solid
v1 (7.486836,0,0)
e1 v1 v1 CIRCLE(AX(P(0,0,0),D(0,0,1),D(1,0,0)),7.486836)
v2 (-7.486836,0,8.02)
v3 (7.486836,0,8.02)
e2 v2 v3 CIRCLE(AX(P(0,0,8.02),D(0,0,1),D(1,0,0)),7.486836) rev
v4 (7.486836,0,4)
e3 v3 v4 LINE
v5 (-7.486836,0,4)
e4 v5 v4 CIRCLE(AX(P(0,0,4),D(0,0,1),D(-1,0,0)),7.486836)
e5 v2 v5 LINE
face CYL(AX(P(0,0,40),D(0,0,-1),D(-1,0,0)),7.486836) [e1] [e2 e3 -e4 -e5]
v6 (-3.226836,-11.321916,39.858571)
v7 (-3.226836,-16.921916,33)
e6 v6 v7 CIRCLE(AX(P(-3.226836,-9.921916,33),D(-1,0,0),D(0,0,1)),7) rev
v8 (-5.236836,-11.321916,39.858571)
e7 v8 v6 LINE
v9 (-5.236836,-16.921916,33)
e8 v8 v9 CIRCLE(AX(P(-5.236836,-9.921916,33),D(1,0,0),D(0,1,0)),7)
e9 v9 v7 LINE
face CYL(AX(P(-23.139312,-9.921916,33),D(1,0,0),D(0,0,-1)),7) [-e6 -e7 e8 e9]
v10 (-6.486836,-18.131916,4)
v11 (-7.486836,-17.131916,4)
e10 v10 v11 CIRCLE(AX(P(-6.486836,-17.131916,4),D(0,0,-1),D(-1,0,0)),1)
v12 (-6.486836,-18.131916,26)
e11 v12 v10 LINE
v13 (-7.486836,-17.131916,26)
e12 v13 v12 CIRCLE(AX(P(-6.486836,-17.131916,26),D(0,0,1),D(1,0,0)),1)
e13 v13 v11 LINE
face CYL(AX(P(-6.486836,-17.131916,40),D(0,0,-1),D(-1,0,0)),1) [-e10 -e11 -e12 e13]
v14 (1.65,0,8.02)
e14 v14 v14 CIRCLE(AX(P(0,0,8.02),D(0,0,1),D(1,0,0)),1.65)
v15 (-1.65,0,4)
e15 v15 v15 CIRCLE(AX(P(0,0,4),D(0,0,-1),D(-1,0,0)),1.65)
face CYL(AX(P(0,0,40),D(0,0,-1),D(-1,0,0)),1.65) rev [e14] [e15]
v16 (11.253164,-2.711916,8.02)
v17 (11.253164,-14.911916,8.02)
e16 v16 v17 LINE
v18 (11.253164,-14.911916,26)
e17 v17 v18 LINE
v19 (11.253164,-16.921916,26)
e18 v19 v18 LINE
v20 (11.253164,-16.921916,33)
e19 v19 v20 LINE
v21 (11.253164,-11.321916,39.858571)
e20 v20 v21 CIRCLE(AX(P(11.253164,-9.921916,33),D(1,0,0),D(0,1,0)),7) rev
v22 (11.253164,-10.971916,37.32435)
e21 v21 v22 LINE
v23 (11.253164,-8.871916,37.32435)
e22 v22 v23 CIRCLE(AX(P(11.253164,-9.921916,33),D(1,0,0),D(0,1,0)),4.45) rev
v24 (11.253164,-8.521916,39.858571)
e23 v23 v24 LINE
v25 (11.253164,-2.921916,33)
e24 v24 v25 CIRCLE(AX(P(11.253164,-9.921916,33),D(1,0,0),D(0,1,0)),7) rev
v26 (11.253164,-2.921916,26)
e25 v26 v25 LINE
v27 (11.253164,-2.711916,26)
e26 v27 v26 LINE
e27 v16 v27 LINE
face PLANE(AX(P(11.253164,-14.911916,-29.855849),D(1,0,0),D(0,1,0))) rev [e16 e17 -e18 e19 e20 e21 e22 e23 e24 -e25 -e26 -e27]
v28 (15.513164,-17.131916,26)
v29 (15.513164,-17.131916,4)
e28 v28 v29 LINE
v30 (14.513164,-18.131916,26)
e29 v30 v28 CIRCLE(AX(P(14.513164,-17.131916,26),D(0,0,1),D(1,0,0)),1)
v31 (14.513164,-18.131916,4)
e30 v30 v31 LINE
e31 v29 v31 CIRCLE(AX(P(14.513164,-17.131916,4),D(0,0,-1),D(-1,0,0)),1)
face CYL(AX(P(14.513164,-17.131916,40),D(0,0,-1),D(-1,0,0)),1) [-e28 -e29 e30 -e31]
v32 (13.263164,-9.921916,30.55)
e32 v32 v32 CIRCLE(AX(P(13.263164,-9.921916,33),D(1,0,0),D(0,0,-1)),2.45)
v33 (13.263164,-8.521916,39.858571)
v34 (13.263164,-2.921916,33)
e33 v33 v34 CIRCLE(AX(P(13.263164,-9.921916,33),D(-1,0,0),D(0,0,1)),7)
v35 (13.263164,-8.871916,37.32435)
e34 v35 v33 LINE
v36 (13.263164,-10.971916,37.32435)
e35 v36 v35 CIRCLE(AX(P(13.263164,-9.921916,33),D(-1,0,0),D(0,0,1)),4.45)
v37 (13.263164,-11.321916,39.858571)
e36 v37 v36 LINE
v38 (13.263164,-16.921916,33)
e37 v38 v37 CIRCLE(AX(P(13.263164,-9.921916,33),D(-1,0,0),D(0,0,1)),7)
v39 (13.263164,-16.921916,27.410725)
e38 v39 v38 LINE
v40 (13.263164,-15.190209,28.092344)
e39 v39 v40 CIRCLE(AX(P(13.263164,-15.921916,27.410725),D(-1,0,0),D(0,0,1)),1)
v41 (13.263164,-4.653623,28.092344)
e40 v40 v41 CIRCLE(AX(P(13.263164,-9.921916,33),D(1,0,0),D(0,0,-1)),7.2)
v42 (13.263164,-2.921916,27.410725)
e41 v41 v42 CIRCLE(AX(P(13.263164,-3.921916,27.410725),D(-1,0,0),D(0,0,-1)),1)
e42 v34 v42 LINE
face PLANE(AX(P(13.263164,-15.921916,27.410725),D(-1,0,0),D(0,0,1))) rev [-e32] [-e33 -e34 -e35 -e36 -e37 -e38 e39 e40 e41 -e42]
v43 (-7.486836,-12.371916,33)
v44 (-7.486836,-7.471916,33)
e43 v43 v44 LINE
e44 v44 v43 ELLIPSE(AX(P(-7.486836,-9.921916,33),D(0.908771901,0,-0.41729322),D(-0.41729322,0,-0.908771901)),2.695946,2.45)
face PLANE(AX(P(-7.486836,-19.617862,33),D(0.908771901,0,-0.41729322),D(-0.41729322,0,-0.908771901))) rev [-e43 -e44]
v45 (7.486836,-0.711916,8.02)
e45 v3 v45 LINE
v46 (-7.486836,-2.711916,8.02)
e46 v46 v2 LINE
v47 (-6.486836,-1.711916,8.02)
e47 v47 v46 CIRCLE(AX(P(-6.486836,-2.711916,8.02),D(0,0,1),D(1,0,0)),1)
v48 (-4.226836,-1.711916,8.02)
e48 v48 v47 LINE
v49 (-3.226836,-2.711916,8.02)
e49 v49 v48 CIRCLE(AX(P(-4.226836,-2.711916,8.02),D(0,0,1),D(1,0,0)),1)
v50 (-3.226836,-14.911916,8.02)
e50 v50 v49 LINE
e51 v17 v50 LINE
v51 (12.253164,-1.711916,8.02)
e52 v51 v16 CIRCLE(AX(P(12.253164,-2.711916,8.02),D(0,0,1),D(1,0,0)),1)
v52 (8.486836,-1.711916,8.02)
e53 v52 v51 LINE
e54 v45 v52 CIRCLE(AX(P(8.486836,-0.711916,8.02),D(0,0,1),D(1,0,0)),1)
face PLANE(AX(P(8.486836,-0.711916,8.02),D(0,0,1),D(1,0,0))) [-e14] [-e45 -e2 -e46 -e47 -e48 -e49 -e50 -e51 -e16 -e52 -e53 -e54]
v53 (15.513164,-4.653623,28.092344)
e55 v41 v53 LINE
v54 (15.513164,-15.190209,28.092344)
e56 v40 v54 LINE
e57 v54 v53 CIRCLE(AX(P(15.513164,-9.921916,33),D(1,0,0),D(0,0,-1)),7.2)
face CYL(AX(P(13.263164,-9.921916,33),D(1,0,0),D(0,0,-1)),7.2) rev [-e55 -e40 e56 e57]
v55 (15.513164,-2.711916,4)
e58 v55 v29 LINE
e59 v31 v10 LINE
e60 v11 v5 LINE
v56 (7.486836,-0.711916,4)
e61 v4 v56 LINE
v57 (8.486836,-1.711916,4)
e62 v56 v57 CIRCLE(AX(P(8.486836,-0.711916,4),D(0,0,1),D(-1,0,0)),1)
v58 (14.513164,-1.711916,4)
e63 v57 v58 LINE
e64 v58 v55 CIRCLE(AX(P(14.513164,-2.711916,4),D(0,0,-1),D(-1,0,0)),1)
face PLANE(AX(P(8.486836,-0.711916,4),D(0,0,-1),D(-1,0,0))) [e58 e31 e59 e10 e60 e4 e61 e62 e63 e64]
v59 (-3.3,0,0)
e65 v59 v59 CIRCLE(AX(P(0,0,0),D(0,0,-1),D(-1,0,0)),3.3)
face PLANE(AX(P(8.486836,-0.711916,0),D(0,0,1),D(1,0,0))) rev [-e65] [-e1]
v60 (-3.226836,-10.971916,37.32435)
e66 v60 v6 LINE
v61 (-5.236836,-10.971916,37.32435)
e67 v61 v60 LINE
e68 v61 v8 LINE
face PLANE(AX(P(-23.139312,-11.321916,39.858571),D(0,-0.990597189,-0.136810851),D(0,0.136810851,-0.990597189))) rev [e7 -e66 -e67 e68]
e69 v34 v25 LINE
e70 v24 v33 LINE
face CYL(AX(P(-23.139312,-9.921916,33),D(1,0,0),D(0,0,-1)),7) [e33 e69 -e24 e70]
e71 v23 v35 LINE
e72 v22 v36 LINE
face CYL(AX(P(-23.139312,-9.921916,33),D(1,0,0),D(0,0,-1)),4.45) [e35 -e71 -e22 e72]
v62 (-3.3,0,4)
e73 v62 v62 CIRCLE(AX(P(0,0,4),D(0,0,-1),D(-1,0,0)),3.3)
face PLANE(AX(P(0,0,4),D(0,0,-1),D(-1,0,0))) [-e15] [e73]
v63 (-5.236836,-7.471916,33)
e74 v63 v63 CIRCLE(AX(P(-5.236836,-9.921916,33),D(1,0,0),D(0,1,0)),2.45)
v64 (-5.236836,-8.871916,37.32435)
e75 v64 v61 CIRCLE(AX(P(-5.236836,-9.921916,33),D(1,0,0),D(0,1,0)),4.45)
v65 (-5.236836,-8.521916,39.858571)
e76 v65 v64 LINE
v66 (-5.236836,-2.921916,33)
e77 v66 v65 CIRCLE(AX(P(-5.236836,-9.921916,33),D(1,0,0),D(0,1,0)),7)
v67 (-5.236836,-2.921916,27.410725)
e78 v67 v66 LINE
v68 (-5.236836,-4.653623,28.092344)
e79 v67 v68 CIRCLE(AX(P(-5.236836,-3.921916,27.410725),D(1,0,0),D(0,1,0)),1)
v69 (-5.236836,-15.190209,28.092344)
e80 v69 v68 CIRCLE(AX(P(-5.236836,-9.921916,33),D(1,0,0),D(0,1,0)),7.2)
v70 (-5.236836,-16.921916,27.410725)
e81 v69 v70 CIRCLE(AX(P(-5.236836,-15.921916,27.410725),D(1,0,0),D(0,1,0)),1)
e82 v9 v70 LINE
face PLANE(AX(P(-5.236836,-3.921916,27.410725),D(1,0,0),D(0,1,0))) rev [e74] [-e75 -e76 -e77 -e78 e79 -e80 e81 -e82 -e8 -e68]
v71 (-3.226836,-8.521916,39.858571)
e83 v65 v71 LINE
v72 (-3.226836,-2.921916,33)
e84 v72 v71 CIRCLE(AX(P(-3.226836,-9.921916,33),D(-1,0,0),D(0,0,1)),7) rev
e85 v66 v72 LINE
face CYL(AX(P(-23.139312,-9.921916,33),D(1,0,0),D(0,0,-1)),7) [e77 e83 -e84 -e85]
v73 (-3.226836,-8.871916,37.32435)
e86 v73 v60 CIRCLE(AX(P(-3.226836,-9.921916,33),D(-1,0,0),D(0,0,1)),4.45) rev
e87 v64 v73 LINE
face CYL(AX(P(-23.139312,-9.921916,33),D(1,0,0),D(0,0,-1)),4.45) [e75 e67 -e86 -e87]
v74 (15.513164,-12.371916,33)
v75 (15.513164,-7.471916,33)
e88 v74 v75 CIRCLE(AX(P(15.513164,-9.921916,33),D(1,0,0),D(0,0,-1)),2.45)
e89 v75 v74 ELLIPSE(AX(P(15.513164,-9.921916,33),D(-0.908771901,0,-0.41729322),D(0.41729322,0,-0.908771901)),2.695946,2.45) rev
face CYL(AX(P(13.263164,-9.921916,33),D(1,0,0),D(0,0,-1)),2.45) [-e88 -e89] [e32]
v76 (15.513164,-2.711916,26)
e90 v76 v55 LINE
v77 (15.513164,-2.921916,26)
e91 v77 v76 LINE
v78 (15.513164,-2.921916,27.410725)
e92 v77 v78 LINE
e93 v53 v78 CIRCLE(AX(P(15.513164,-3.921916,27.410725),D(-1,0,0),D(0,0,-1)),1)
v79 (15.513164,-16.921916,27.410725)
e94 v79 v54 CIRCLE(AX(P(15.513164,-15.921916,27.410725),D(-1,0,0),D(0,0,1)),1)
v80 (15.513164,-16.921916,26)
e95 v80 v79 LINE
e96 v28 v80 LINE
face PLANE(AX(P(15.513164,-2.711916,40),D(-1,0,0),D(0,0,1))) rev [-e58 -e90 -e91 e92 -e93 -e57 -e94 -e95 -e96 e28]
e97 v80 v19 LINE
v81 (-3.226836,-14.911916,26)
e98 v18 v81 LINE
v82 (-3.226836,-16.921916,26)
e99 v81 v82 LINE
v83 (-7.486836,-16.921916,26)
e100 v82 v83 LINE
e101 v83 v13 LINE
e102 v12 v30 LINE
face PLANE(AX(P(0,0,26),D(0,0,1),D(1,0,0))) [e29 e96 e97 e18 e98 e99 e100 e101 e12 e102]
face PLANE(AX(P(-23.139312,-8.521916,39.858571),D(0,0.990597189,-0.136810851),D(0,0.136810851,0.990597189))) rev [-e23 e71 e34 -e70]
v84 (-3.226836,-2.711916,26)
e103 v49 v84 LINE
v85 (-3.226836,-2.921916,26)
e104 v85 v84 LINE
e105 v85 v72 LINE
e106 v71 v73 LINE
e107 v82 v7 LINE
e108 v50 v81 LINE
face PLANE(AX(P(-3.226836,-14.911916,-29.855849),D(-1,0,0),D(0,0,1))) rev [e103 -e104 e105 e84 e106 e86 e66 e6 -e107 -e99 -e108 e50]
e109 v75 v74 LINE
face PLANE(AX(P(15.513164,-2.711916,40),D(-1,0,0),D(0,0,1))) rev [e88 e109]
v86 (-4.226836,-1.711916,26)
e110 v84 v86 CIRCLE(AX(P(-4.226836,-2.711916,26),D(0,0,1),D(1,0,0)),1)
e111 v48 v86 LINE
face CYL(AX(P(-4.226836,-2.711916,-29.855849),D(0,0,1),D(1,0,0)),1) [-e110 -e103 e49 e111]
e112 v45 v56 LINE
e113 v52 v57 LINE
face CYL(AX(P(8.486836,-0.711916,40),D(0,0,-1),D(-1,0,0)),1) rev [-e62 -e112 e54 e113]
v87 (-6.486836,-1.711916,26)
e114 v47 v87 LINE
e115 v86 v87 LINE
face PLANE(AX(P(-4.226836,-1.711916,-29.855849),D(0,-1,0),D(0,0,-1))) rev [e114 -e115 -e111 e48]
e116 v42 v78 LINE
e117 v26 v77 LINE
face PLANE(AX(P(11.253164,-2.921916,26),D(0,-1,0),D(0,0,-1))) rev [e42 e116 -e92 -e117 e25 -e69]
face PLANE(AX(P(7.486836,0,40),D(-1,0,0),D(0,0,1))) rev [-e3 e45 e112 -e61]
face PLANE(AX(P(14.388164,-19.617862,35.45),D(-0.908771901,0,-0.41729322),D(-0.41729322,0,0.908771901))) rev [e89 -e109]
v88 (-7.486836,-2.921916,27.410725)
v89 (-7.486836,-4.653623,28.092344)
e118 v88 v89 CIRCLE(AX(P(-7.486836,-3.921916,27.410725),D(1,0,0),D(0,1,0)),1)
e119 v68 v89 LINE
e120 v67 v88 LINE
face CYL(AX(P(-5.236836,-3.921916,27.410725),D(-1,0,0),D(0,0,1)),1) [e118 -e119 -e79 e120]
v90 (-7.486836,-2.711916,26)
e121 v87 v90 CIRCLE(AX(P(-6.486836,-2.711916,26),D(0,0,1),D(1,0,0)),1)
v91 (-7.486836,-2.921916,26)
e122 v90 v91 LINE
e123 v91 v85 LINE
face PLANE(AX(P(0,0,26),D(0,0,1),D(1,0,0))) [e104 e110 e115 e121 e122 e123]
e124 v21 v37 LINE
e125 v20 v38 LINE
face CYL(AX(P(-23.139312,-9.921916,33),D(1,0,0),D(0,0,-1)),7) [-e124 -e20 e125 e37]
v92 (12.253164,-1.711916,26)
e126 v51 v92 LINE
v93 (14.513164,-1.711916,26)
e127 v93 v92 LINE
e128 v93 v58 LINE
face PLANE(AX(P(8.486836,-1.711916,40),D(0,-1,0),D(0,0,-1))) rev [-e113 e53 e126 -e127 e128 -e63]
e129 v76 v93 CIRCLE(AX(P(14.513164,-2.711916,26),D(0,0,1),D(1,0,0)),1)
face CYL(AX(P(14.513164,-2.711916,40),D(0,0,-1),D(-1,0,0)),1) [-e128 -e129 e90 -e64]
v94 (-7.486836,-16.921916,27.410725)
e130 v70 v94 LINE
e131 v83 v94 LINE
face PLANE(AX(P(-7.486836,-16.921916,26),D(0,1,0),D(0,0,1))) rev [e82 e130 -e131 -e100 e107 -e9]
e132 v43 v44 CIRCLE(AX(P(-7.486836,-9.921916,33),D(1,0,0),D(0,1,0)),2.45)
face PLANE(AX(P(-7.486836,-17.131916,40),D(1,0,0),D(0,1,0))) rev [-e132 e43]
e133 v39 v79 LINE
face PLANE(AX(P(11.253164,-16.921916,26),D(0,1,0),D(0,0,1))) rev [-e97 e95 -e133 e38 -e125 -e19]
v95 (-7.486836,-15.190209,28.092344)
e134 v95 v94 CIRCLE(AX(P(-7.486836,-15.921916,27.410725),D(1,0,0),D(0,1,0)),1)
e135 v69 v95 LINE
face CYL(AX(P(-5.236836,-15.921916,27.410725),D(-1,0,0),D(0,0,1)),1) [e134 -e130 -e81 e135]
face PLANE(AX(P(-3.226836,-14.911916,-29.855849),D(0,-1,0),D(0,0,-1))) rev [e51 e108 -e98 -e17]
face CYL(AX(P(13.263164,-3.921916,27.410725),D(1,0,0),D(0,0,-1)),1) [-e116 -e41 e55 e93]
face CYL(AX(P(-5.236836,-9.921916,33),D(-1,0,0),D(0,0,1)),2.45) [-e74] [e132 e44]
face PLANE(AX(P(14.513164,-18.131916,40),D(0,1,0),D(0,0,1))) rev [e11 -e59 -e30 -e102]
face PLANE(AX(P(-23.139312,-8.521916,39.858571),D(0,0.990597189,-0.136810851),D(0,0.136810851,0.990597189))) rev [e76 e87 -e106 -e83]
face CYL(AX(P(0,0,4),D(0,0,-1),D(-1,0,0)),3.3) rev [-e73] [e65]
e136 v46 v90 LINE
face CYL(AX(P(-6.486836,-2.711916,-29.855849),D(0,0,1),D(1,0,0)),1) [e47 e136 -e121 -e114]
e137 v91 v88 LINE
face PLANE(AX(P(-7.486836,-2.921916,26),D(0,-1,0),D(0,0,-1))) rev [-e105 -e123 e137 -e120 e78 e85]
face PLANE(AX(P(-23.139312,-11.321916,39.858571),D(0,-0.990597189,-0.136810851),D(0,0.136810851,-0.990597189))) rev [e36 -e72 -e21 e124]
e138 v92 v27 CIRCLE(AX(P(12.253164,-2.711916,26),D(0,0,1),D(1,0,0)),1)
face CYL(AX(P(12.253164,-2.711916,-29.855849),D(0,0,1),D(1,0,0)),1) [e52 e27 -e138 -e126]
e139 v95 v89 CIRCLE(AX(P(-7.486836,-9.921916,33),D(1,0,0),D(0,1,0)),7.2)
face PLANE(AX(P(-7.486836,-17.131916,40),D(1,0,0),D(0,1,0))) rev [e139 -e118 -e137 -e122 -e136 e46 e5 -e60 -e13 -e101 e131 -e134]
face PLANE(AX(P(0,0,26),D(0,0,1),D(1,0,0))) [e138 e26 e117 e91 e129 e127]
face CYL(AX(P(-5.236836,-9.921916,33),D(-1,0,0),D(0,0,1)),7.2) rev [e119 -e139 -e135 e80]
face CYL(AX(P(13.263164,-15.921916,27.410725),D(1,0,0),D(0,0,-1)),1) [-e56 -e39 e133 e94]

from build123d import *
from build123d.topology import SkipClean

# Parameters (mm, degrees)
SKETCH1_R           = 1.65
BOSS_EXTRUDE1_DEPTH = 40
CUT_EXTRUDE1_START  = -31.98
CUT_EXTRUDE1_DEPTH  = 31.98
SKETCH3_R           = 3.3
CUT_EXTRUDE2_DEPTH  = 4
CUT_EXTRUDE3_DEPTH  = 14
CUT_EXTRUDE4_REACH  = 51.576
SKETCH6_R           = 2.45
CUT_EXTRUDE5_DEPTH  = 2.25
CUT_EXTRUDE6_START  = -20.75
SKETCH6_2_R         = 2.45
CUT_EXTRUDE6_DEPTH  = 2.25
CUT_EXTRUDE7_START  = -9.45
CUT_EXTRUDE7_DEPTH  = 4.9


with BuildPart() as part:
    # Sketch1 → Boss-Extrude1 (new body)
    with BuildSketch(Plane.XY):
        with BuildLine():
            Line((8.48683607, -1.711916105), (14.51316393, -1.711916105))
            ThreePointArc((14.51316393, -1.711916105), (15.220270711, -2.004809324), (15.51316393, -2.711916105))
            Line((15.51316393, -2.711916105), (15.51316393, -17.131916105))
            ThreePointArc((15.51316393, -17.131916105), (15.220270711, -17.839022886), (14.51316393, -18.131916105))
            Line((14.51316393, -18.131916105), (-6.48683607, -18.131916105))
            ThreePointArc((-6.48683607, -18.131916105), (-7.193942851, -17.839022886), (-7.48683607, -17.131916105))
            Line((-7.48683607, -17.131916105), (-7.48683607, 0))
            ThreePointArc((-7.48683607, 0), (0, 7.48683607), (7.48683607, 0))
            Line((7.48683607, 0), (7.48683607, -0.711916105))
            ThreePointArc((7.48683607, -0.711916105), (7.779729289, -1.419022886), (8.48683607, -1.711916105))
        make_face()
        with Locations(Location((0, 0, 0), (0, 0, 180))):
            Circle(SKETCH1_R, mode=Mode.SUBTRACT)
    extrude(amount=BOSS_EXTRUDE1_DEPTH)

    # Sketch2 → Cut-Extrude1 (cut)
    with BuildSketch(Plane.XY.offset(40).offset(CUT_EXTRUDE1_START)):
        with BuildLine():
            Line((-3.22683607, -14.911916105), (-3.22683607, -2.711916105))
            ThreePointArc((-3.22683607, -2.711916105), (-3.519729289, -2.004809324), (-4.22683607, -1.711916105))
            Line((-4.22683607, -1.711916105), (-6.48683607, -1.711916105))
            ThreePointArc((-6.48683607, -1.711916105), (-7.193942851, -2.004809324), (-7.48683607, -2.711916105))
            Line((-7.48683607, -2.711916105), (-7.48683607, 0))
            ThreePointArc((-7.48683607, 0), (0, 7.48683607), (7.48683607, 0))
            Line((7.48683607, 0), (7.48683607, -0.711916105))
            ThreePointArc((7.48683607, -0.711916105), (7.779729289, -1.419022886), (8.48683607, -1.711916105))
            Line((8.48683607, -1.711916105), (12.25316393, -1.711916105))
            ThreePointArc((12.25316393, -1.711916105), (11.546057149, -2.004809324), (11.25316393, -2.711916105))
            Line((11.25316393, -2.711916105), (11.25316393, -14.911916105))
            Line((11.25316393, -14.911916105), (-3.22683607, -14.911916105))
        make_face()
    extrude(amount=CUT_EXTRUDE1_DEPTH, mode=Mode.SUBTRACT)

    # Sketch3 → Cut-Extrude2 (cut)
    with SkipClean():  # the faces are left unmerged after this step: merging them gives an invalid solid
        with BuildSketch(Plane(origin=(0, 0, 0), x_dir=(-1, 0, 0), z_dir=(0, 0, -1))):
            Circle(SKETCH3_R)
            with BuildLine():
                Line((-7.48683607, 0), (-7.48683607, -0.711916105))
                ThreePointArc((-7.48683607, -0.711916105), (-7.779729289, -1.419022886), (-8.48683607, -1.711916105))
                Line((-8.48683607, -1.711916105), (-14.51316393, -1.711916105))
                ThreePointArc((-14.51316393, -1.711916105), (-15.220270711, -2.004809324), (-15.51316393, -2.711916105))
                Line((-15.51316393, -2.711916105), (-15.51316393, -17.131916105))
                ThreePointArc((-15.51316393, -17.131916105), (-15.220270711, -17.839022886), (-14.51316393, -18.131916105))
                Line((-14.51316393, -18.131916105), (6.48683607, -18.131916105))
                ThreePointArc((6.48683607, -18.131916105), (7.193942851, -17.839022886), (7.48683607, -17.131916105))
                Line((7.48683607, -17.131916105), (7.48683607, 0))
                ThreePointArc((7.48683607, 0), (0, -7.48683607), (-7.48683607, 0))
            make_face()
        extrude(amount=-CUT_EXTRUDE2_DEPTH, mode=Mode.SUBTRACT)
    add(part.part.scale(1), mode=Mode.REPLACE)  # the faces are merged on a copy

    # Sketch4 → Cut-Extrude3 (cut)
    with BuildSketch(Plane.XY.offset(40)):
        Polygon((-3.22683607, -16.921916105), (-3.22683607, -2.921916105), (-7.48683607, -2.921916105), (-7.48683607, -1.711916105), (15.51316393, -1.711916105), (15.51316393, -2.921916105), (11.25316393, -2.921916105), (11.25316393, -16.921916105), (15.51316393, -16.921916105), (15.51316393, -18.131916105), (-7.48683607, -18.131916105), (-7.48683607, -16.921916105), align=None)
    extrude(amount=-CUT_EXTRUDE3_DEPTH, mode=Mode.SUBTRACT)

    # Cut-Extrude4: up to this face of the body (flat: up to its plane)
    cut_extrude4_end = Plane(part.part.faces().sort_by_distance((-7.48683607, -9.743748244, 21.544013895))[0])
    # Sketch5 → Cut-Extrude4 (cut, up to the picked face)
    with BuildSketch(Plane(origin=(15.51316393, 0, 0), x_dir=(0, 0, -1), z_dir=(1, 0, 0)), mode=Mode.PRIVATE) as cut_extrude4_sk1:
        with BuildLine():
            Line((-39.85857128, -8.521916105), (-37.324349662, -8.871916105))
            ThreePointArc((-37.324349662, -8.871916105), (-37.45, -9.921916105), (-37.324349662, -10.971916105))
            Line((-37.324349662, -10.971916105), (-39.85857128, -11.321916105))
            ThreePointArc((-39.85857128, -11.321916105), (-37.427188724, -15.34409279), (-33, -16.921916105))
            Line((-33, -16.921916105), (-40, -16.921916105))
            Line((-40, -16.921916105), (-40, -2.921916105))
            Line((-40, -2.921916105), (-33, -2.921916105))
            ThreePointArc((-33, -2.921916105), (-37.427188724, -4.49973942), (-39.85857128, -8.521916105))
        make_face()
    cut_extrude4_tool1 = split(extrude(cut_extrude4_sk1.sketch, amount=-CUT_EXTRUDE4_REACH, mode=Mode.PRIVATE), bisect_by=cut_extrude4_end, keep=Keep.BOTH, mode=Mode.PRIVATE)
    add(cut_extrude4_tool1.solids().sort_by(Axis((15.513164, -9.921916, 38.506526), (-1, 0, 0)))[0], mode=Mode.SUBTRACT)

    # Sketch6 → Cut-Extrude5 (cut)
    with BuildSketch(Plane(origin=(15.51316393, 0, 0), x_dir=(0, 0, -1), z_dir=(1, 0, 0))):
        with BuildLine():
            Line((-27.410724555, -2.921916105), (-31.314770045, -2.921916105))
            ThreePointArc((-31.314770045, -2.921916105), (-40.2, -9.921916105), (-31.314770045, -16.921916105))
            Line((-31.314770045, -16.921916105), (-27.410724555, -16.921916105))
            ThreePointArc((-27.410724555, -16.921916105), (-28.341237133, -16.288176042), (-28.092343512, -15.190208788))
            ThreePointArc((-28.092343512, -15.190208788), (-25.8, -9.921916105), (-28.092343512, -4.653623422))
            ThreePointArc((-28.092343512, -4.653623422), (-28.341237133, -3.555656168), (-27.410724555, -2.921916105))
        make_face()
        with Locations((-33, -9.921916105)):
            Circle(SKETCH6_R, mode=Mode.SUBTRACT)
    extrude(amount=-CUT_EXTRUDE5_DEPTH, mode=Mode.SUBTRACT)

    # Sketch6<2> → Cut-Extrude6 (cut)
    with BuildSketch(Plane(origin=(15.51316393, 0, 0), x_dir=(0, 0, -1), z_dir=(1, 0, 0)).offset(CUT_EXTRUDE6_START)):
        with BuildLine():
            Line((-27.410724555, -2.921916105), (-31.314770045, -2.921916105))
            ThreePointArc((-31.314770045, -2.921916105), (-40.2, -9.921916105), (-31.314770045, -16.921916105))
            Line((-31.314770045, -16.921916105), (-27.410724555, -16.921916105))
            ThreePointArc((-27.410724555, -16.921916105), (-28.341237133, -16.288176042), (-28.092343512, -15.190208788))
            ThreePointArc((-28.092343512, -15.190208788), (-25.8, -9.921916105), (-28.092343512, -4.653623422))
            ThreePointArc((-28.092343512, -4.653623422), (-28.341237133, -3.555656168), (-27.410724555, -2.921916105))
        make_face()
        with Locations((-33, -9.921916105)):
            Circle(SKETCH6_2_R, mode=Mode.SUBTRACT)
    extrude(amount=-CUT_EXTRUDE6_DEPTH, mode=Mode.SUBTRACT)

    # Sketch7 → Cut-Extrude7 (cut)
    with BuildSketch(Plane(origin=(0, -2.921916105, 0), x_dir=(1, 0, 0), z_dir=(0, 1, 0)).offset(CUT_EXTRUDE7_START)):
        Polygon((-7.48683607, -33), (-6.36183607, -35.45), (-7.48683607, -35.45), align=None)
        Polygon((15.51316393, -33), (15.51316393, -35.45), (14.38816393, -35.45), align=None)
    extrude(amount=CUT_EXTRUDE7_DEPTH, mode=Mode.SUBTRACT)


solid = part.part
